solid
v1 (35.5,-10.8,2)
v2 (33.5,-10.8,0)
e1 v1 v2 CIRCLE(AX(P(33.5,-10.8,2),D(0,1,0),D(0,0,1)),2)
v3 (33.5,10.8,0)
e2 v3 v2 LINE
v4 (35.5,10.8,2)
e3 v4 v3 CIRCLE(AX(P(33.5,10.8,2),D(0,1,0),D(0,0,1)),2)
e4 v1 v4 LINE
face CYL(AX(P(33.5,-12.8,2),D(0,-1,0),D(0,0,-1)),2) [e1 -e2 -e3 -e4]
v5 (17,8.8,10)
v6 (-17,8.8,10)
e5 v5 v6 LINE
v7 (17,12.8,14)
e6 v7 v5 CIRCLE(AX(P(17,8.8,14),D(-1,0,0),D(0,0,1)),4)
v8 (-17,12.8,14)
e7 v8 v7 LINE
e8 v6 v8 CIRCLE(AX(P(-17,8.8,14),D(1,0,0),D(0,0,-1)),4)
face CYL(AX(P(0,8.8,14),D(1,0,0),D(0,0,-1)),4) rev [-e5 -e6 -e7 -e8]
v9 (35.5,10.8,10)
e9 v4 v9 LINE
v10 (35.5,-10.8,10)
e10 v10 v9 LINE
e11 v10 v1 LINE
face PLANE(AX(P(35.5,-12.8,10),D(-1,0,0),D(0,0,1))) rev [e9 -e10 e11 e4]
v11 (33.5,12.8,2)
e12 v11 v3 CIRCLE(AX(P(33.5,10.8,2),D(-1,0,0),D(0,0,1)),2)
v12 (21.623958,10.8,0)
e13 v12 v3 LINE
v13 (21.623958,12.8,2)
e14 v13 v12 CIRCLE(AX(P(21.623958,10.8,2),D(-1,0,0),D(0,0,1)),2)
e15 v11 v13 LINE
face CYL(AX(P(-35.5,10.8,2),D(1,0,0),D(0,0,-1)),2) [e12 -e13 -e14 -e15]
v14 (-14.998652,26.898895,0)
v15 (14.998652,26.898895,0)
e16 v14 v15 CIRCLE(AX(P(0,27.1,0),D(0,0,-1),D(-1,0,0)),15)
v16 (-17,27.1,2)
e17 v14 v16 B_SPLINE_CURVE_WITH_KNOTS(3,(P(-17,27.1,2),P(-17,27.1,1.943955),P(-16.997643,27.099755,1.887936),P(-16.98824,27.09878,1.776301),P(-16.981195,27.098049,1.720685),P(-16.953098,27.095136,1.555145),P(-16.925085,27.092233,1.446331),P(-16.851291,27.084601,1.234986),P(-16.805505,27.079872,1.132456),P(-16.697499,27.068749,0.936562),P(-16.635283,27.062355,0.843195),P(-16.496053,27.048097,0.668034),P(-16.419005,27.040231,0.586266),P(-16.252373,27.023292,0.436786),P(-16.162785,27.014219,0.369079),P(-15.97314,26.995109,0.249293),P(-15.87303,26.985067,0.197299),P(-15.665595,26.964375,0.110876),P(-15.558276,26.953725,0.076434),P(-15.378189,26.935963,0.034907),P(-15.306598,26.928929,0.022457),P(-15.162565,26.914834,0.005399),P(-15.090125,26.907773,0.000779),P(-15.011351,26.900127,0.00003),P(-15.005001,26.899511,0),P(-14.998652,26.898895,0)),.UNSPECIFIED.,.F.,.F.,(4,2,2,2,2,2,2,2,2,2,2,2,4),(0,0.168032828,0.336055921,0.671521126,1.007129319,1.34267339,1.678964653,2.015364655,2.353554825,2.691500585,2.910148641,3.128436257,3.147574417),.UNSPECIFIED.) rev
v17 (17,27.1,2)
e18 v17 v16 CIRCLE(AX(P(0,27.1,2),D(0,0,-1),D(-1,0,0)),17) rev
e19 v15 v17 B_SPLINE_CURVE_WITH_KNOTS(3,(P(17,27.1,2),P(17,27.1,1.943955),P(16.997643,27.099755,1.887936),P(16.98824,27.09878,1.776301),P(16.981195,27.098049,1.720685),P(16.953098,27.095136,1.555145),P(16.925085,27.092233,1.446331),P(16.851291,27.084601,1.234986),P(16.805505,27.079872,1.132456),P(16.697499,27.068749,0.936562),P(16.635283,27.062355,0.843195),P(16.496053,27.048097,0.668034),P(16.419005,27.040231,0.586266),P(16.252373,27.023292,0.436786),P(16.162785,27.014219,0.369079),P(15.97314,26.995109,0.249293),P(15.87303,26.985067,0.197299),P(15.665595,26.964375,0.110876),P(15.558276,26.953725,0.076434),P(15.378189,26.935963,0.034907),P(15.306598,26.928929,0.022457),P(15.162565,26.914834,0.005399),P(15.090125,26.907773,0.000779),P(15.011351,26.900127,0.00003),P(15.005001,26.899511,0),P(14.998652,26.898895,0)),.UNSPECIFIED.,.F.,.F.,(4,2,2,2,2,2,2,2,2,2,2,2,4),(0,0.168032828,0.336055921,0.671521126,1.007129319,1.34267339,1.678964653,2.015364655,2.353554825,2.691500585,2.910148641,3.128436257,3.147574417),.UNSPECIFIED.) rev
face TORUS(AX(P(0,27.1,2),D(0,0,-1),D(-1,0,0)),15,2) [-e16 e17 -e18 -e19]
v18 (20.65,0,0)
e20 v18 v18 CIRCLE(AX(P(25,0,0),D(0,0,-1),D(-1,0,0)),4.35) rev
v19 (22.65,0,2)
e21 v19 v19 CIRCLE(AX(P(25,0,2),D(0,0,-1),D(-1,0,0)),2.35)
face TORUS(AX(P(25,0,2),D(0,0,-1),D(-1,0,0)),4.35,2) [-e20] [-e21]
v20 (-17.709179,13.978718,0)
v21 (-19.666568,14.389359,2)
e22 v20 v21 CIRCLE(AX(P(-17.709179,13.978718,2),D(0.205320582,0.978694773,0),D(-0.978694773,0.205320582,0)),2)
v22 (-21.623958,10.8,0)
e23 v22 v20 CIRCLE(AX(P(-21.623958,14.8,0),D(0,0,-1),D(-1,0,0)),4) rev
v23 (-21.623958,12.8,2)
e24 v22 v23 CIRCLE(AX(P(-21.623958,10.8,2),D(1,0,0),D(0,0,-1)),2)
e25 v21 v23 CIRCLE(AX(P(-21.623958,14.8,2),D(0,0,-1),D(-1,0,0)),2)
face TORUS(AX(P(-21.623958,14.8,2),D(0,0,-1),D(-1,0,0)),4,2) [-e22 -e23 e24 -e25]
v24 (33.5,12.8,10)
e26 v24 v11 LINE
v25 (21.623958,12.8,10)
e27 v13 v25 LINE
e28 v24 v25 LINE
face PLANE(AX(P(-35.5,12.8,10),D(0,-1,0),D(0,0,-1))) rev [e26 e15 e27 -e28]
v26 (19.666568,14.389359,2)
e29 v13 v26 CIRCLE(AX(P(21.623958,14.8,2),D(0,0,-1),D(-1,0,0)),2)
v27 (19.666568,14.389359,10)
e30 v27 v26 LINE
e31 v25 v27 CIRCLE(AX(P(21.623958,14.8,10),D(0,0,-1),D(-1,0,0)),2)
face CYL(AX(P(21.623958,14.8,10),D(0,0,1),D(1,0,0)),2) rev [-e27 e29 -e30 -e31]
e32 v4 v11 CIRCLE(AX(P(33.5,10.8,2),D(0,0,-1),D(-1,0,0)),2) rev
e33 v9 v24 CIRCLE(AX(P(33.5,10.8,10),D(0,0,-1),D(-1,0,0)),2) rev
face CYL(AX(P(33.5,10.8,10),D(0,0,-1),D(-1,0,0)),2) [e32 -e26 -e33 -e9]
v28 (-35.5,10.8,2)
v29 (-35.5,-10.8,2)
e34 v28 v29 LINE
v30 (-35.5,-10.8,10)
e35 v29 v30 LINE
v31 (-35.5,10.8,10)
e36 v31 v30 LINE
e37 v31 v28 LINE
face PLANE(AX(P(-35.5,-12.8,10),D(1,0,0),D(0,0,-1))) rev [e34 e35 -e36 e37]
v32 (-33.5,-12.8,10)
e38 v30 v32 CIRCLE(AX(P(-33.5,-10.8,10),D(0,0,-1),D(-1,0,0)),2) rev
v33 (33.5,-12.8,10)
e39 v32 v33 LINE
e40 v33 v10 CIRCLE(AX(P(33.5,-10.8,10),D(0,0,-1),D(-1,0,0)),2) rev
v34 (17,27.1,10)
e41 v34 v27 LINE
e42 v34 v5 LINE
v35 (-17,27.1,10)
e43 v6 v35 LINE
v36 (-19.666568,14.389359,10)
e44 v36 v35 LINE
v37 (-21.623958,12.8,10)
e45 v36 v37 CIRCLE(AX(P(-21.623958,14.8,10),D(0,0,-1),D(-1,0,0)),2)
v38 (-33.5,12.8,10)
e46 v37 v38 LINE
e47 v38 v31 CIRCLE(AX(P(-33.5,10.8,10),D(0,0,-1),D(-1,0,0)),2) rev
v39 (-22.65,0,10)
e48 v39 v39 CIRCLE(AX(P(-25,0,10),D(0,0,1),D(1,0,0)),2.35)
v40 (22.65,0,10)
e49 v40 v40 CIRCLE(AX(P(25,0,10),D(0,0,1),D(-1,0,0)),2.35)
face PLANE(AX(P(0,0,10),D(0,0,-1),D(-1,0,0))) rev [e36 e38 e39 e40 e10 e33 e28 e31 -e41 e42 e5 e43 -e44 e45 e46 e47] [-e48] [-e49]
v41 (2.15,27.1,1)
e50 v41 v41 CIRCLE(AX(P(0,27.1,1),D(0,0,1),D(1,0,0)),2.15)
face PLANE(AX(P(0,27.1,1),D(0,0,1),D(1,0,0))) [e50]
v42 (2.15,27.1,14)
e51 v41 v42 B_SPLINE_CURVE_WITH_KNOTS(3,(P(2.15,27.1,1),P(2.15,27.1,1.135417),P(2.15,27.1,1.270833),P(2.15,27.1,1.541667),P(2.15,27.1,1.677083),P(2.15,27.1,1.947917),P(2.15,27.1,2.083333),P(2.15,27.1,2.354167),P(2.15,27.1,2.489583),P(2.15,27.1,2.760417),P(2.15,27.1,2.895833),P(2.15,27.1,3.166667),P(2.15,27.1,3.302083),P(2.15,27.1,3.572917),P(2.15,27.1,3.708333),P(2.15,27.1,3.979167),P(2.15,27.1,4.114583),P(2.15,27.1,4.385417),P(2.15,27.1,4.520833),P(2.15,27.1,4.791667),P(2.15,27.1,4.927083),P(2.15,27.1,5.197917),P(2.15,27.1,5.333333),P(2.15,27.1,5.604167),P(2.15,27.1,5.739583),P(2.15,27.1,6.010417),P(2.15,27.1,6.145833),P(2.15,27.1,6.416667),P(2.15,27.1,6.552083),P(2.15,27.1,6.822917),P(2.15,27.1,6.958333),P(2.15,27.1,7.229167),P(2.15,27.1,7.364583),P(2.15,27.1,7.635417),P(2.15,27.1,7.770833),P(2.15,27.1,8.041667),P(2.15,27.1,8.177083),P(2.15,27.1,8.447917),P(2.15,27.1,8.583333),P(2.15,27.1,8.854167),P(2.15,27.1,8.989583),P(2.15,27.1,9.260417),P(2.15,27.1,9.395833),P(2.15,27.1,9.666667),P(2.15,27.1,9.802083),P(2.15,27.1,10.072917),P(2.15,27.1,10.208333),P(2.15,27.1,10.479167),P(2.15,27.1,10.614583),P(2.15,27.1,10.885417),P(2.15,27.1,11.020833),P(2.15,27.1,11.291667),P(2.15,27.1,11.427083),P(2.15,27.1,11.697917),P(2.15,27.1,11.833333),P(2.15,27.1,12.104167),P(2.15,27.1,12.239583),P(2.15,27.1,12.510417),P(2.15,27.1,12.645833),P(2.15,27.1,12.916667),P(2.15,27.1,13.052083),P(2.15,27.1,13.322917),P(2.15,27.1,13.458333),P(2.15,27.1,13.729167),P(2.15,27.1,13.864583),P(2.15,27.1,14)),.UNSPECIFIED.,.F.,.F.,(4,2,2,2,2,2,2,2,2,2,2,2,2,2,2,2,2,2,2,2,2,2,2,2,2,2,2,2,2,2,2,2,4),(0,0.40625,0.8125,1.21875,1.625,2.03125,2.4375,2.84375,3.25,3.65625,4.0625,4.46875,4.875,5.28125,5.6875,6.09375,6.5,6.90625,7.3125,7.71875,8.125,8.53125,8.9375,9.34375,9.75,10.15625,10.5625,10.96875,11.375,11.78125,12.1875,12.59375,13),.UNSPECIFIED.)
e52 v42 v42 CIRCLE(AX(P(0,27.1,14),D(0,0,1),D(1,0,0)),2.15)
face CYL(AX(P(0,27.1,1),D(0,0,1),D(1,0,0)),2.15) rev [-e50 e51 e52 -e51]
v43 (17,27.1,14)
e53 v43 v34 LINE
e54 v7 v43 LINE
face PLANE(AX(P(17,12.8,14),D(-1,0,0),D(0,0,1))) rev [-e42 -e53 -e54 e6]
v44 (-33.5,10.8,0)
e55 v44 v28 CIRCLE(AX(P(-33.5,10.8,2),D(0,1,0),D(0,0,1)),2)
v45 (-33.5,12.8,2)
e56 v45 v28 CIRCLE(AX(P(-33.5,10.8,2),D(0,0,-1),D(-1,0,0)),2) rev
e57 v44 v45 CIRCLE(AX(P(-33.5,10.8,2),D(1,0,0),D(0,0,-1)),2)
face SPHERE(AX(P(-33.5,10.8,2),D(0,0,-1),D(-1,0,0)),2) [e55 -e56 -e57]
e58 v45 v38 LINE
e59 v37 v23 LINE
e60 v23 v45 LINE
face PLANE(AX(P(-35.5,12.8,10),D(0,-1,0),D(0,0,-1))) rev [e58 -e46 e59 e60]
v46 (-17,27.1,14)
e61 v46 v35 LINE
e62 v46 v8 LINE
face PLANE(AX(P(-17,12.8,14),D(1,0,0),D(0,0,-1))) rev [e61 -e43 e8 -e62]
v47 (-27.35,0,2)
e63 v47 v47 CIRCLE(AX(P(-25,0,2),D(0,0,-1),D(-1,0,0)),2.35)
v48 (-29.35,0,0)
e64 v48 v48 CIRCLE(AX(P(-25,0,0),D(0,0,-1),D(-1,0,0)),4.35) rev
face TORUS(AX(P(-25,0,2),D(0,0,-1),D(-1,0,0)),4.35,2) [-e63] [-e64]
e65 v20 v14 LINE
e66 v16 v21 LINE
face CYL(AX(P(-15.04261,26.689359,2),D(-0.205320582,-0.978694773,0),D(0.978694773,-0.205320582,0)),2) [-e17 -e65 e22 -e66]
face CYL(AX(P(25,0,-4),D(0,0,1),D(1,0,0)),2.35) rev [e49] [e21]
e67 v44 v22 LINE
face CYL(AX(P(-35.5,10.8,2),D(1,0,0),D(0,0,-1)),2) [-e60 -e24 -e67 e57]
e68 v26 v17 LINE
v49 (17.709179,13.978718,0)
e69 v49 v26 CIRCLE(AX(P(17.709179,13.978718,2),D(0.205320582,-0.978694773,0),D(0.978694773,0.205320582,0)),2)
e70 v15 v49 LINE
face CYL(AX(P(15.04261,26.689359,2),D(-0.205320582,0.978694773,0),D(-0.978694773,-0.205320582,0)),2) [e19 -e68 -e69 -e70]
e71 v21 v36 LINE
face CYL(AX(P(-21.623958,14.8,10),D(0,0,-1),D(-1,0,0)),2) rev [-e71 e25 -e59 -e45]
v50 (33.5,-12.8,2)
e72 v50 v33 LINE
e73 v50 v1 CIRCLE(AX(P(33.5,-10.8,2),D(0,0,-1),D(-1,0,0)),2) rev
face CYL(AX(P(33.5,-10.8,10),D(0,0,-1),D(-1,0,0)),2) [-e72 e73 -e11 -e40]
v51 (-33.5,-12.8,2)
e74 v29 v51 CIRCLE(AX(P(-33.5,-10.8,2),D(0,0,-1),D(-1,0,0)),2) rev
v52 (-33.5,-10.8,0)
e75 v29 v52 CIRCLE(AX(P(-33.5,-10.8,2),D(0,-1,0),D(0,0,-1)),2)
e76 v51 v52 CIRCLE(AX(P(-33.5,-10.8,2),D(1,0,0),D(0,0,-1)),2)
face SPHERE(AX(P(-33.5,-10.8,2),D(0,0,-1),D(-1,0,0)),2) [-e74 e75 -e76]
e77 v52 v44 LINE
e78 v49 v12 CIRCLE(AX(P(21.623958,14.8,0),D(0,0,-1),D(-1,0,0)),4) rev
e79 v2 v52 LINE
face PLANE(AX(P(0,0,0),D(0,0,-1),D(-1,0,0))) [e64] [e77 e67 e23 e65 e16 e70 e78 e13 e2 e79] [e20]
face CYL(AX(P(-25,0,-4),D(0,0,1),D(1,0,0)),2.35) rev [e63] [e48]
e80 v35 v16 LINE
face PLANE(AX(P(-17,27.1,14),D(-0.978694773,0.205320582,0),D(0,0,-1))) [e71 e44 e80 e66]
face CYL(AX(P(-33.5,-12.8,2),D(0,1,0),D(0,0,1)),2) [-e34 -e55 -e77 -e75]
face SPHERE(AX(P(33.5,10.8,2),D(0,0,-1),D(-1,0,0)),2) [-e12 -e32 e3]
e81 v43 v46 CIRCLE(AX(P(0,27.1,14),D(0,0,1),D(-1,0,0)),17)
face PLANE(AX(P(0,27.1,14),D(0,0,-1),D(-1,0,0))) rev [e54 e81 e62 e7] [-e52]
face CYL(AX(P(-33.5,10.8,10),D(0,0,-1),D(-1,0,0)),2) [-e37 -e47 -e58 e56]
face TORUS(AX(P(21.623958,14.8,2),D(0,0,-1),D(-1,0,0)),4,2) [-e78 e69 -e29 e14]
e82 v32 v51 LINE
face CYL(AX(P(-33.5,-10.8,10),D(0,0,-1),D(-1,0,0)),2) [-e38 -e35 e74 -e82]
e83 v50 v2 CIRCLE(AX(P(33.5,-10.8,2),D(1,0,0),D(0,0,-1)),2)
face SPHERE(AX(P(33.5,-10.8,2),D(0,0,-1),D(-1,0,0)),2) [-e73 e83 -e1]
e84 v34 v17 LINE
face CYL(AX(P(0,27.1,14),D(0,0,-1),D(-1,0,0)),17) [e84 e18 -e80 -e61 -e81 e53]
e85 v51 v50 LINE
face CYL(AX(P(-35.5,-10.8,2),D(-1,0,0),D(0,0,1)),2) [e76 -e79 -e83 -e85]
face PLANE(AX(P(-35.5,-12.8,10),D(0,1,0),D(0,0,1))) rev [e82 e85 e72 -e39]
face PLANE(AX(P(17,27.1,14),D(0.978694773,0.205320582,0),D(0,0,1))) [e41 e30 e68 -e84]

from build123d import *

# Parameters (mm, degrees)
SKETCH1_W           = 71
SKETCH1_H           = 25.6
BOSS_EXTRUDE1_DEPTH = 10
BOSS_EXTRUDE2_DEPTH = 14
FILLET1_R           = 4
CHAMFER1_START      = -22.201998907
CHAMFER1_OUTLINE_W  = 14.611297
CHAMFER1_OUTLINE_H  = 10
CHAMFER1_DEPTH      = 3.757366646
CHAMFER2_START      = 18.444632261
CHAMFER2_OUTLINE_W  = 14.611297
CHAMFER2_OUTLINE_H  = 10
CHAMFER2_DEPTH      = 3.757366646
FILLET3_R           = 2
SKETCH5_R           = 2.35
CUT_EXTRUDE1_DEPTH  = 14
FILLET4_R           = 2
SKETCH6_R           = 2.15
CUT_EXTRUDE2_DEPTH  = 13


with BuildPart() as part:
    # Sketch1 → Boss-Extrude1 (new body)
    with BuildSketch(Plane.XY):
        Rectangle(SKETCH1_W, SKETCH1_H)
    extrude(amount=BOSS_EXTRUDE1_DEPTH)

    # Sketch3 → Boss-Extrude2 (add)
    with BuildSketch(Plane.XY):
        with BuildLine():
            Line((-17, 12.8), (17, 12.8))
            Line((17, 12.8), (17, 27.1))
            ThreePointArc((17, 27.1), (0, 44.1), (-17, 27.1))
            Line((-17, 27.1), (-17, 12.8))
        make_face()
    extrude(amount=BOSS_EXTRUDE2_DEPTH)

    # Fillet1
    fillet1_edges = [part.edges().sort_by_distance(p)[0] for p in [
        (0, 12.8, 10),
    ]]
    fillet(fillet1_edges, radius=FILLET1_R - 0.0001)  # a hair under: the kernel refuses the full size

    # Chamfer1: read off the stored shape, not the designer's step
    # Chamfer1 outline → Chamfer1 (add)
    with BuildSketch(Plane(origin=(0, 0, 0), x_dir=(0.2053205817495901, 0.9786947730063801, 0), z_dir=(0.9786947730063802, -0.20532058174959006, 0)).offset(CHAMFER1_START)):
        with Locations((15.726529959, 5)):
            Rectangle(CHAMFER1_OUTLINE_W, CHAMFER1_OUTLINE_H)
    extrude(amount=CHAMFER1_DEPTH)

    # Chamfer2: read off the stored shape, not the designer's step
    # Chamfer2 outline → Chamfer2 (add)
    with BuildSketch(Plane(origin=(0, 0, 0), x_dir=(-0.2053205817495901, 0.9786947730063801, 0), z_dir=(0.9786947730063802, 0.20532058174959006, 0)).offset(CHAMFER2_START)):
        with Locations((15.726529959, 5)):
            Rectangle(CHAMFER2_OUTLINE_W, CHAMFER2_OUTLINE_H)
    extrude(amount=CHAMFER2_DEPTH)

    # Fillet3
    fillet3_edges = [part.edges().sort_by_distance(p)[0] for p in [
        (-20.000000001, 12.8, 5),
        (20.000000001, 12.8, 5),
        (35.5, -12.8, 5),
        (-35.5, -12.8, 5),
        (-35.5, 12.8, 5),
        (35.5, 12.8, 5),
    ]]
    fillet(fillet3_edges, radius=FILLET3_R)

    # Sketch5 → Cut-Extrude1 (cut)
    with BuildSketch(Plane.XY.offset(10)):
        with Locations((-25, 0)):
            Circle(SKETCH5_R)
        with Locations(Location((25, 0, 0), (0, 0, 180))):
            Circle(SKETCH5_R)
    extrude(amount=-CUT_EXTRUDE1_DEPTH, mode=Mode.SUBTRACT)

    # Fillet4
    fillet4_edges = [part.edges().sort_by_distance(p)[0] for p in [
        (-27.35, 0, 0),
        (27.35, 0, 0),
        (0, 44.1, 0),
        (-18.333284039, 20.744679418, 0),
        (27.561978811, 12.8, 0),
        (35.5, 0, 0),
        (0, -12.8, 0),
        (-35.5, 0, 0),
        (-27.561978811, 12.8, 0),
        (18.333284039, 20.744679418, 0),
        (-34.914213562, 12.214213562, 0),
        (-34.914213562, -12.214213562, 0),
        (34.914213562, -12.214213562, 0),
        (34.914213562, 12.214213562, 0),
        (-20.363259865, 13.247376039, 0),
        (20.363259865, 13.247376039, 0),
    ]]
    fillet(fillet4_edges, radius=FILLET4_R)

    # Sketch6 → Cut-Extrude2 (cut)
    with BuildSketch(Plane.XY.offset(14)):
        with Locations((0, 27.1)):
            Circle(SKETCH6_R)
    extrude(amount=-CUT_EXTRUDE2_DEPTH, mode=Mode.SUBTRACT)


solid = part.part
